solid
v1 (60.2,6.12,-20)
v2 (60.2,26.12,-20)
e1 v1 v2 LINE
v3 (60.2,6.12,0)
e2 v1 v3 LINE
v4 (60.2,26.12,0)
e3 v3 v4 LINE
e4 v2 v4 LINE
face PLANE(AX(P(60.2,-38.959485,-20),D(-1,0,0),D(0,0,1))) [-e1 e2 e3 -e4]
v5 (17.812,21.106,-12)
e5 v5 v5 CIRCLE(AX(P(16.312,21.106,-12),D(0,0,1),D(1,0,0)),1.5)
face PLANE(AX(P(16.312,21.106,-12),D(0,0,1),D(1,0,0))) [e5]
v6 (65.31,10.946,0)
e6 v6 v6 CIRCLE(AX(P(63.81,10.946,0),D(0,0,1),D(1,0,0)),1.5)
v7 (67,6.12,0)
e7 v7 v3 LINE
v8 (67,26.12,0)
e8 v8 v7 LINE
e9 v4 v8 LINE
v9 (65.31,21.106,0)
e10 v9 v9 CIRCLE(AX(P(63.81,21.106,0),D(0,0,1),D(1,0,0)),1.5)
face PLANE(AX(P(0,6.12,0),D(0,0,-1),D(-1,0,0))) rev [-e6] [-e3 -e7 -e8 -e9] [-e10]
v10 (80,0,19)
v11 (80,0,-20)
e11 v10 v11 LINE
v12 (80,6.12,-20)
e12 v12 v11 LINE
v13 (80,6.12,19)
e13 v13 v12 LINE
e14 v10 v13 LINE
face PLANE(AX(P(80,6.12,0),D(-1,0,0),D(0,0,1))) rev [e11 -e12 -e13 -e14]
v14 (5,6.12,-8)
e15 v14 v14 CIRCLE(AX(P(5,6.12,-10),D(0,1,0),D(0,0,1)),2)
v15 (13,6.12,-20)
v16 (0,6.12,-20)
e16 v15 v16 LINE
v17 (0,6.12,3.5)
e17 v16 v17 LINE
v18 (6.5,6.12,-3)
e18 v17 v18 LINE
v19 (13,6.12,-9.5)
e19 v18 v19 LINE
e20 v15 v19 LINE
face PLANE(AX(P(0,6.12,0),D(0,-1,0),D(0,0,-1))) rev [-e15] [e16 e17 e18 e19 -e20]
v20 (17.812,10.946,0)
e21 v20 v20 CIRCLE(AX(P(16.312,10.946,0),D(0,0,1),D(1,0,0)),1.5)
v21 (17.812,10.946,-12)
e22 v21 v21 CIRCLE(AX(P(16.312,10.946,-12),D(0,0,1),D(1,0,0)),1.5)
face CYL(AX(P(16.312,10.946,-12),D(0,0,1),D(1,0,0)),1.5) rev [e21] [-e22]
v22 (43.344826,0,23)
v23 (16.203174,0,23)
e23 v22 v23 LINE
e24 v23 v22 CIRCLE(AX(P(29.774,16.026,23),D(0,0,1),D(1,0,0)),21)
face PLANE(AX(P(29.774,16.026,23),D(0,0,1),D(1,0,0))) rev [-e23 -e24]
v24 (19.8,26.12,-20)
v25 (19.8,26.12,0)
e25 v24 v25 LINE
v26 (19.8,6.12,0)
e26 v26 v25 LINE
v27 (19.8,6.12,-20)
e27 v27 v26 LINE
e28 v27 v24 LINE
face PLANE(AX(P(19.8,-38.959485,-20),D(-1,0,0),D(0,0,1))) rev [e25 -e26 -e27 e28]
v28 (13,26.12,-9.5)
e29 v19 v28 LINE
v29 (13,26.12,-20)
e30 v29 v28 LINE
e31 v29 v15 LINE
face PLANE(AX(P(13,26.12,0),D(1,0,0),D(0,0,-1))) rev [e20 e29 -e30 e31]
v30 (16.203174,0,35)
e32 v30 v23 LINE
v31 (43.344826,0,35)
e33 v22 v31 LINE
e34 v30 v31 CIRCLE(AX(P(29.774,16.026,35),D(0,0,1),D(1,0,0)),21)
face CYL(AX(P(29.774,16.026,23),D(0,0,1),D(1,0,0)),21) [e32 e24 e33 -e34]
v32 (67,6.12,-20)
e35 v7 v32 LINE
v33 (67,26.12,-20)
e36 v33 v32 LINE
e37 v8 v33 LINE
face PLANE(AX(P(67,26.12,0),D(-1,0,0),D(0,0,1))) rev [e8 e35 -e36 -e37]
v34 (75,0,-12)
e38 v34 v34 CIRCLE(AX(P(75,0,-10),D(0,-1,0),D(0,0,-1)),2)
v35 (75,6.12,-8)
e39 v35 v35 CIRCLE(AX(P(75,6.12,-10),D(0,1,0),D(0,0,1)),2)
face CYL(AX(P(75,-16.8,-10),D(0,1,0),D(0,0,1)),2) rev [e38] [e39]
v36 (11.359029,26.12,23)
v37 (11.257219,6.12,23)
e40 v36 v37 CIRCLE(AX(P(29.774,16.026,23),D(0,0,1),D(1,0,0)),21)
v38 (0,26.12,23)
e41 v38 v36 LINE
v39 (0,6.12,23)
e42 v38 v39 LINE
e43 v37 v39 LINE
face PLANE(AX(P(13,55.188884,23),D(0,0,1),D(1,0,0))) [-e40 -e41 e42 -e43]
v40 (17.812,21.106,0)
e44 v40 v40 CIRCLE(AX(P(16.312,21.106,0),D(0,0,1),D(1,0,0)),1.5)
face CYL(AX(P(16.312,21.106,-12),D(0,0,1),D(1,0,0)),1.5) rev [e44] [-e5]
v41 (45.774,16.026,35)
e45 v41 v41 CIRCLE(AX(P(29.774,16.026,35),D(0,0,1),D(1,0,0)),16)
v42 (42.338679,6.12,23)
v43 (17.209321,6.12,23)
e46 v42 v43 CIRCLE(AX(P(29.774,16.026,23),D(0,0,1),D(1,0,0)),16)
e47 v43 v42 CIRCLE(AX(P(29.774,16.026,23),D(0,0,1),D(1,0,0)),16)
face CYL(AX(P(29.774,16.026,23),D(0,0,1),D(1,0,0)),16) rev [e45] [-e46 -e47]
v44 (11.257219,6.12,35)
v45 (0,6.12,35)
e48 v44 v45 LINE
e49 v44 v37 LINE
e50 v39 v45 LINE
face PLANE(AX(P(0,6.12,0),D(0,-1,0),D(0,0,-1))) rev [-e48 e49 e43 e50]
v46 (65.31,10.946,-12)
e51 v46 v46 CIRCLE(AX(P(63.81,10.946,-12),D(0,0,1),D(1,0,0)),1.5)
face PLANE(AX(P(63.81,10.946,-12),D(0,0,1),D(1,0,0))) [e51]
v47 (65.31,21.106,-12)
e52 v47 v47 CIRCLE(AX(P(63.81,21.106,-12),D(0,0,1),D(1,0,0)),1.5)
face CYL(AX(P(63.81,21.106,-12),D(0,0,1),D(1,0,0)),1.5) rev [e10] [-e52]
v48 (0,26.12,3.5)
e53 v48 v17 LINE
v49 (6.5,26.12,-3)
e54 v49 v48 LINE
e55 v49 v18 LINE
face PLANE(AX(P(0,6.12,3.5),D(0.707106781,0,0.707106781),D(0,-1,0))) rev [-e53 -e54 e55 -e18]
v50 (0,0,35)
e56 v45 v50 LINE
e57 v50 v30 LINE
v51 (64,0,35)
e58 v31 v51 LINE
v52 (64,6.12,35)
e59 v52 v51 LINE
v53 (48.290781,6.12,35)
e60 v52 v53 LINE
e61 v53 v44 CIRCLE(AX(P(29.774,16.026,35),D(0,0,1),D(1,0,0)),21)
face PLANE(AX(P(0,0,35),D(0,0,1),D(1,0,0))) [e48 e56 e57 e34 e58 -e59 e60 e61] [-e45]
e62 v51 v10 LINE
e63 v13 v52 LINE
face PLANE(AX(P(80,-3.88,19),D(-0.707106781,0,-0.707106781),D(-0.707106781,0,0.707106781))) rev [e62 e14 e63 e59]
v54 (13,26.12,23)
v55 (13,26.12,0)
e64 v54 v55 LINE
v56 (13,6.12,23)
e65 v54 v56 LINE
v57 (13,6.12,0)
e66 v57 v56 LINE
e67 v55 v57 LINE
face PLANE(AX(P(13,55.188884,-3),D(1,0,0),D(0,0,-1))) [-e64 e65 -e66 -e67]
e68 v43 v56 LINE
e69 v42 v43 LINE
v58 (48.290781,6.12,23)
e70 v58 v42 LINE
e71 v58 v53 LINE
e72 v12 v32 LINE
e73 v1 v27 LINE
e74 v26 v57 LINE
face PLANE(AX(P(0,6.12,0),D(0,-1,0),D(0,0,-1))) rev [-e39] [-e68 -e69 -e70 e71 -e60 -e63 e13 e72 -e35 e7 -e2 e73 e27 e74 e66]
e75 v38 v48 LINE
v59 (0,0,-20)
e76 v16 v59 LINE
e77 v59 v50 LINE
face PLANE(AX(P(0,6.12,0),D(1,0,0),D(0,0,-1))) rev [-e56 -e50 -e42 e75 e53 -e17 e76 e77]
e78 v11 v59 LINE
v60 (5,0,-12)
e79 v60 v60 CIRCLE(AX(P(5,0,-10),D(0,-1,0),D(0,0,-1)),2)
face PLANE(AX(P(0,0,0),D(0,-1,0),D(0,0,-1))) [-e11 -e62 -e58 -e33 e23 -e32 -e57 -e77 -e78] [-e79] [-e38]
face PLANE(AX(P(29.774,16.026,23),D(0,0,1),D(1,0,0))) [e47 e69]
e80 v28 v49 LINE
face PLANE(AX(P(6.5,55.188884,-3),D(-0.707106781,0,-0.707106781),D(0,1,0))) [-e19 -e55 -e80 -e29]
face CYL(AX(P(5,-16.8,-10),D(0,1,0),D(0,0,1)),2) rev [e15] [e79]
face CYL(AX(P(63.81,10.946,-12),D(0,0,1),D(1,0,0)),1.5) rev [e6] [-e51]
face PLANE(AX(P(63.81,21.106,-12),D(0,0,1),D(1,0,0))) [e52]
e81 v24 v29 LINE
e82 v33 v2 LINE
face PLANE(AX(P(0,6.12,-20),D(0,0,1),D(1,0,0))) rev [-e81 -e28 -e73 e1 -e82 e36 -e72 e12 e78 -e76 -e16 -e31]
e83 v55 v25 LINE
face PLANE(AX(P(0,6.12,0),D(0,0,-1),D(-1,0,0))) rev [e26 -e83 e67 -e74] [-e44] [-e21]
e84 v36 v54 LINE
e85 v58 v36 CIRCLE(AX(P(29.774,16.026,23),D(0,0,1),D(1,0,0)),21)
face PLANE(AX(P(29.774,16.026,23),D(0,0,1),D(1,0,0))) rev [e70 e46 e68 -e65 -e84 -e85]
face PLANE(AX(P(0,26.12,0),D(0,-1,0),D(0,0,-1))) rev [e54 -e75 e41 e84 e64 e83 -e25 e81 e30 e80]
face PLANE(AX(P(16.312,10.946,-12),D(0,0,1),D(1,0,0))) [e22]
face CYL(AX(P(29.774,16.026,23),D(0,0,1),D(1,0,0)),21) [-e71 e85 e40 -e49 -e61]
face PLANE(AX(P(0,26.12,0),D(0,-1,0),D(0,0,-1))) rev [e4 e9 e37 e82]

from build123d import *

# Parameters (mm, degrees)
SKETCH1_W           = 80
SKETCH1_H           = 20
BOSS_EXTRUDE1_DEPTH = 6.12
SKETCH14_R          = 2
CUT_EXTRUDE7_DEPTH  = 22.92
SKETCH2_W           = 7
SKETCH2_H           = 20
BOSS_EXTRUDE2_DEPTH = 20
SKETCH3_W           = 80
SKETCH3_H           = 6.12
BOSS_EXTRUDE3_DEPTH = 35
SKETCH5_R           = 21
BOSS_EXTRUDE4_DEPTH = 12
SKETCH4_R           = 16
CUT_EXTRUDE1_DEPTH  = 12
SKETCH7_R           = 1.5
CUT_EXTRUDE2_DEPTH  = 12
CUT_EXTRUDE4_DEPTH  = 10
SKETCH15_W          = 40.4
SKETCH15_H          = 20
CUT_EXTRUDE8_DEPTH  = 20
SKETCH16_W          = 13
SKETCH16_H          = 26
BOSS_EXTRUDE6_DEPTH = 20
CHAMFER1_SIZE       = 6.5


with BuildPart() as part:
    # Sketch1 → Boss-Extrude1 (new body)
    with BuildSketch(Plane(origin=(0, 0, 0), x_dir=(1, 0, 0), z_dir=(0, 1, 0))):
        with Locations((40, 10)):
            Rectangle(SKETCH1_W, SKETCH1_H)
    extrude(amount=BOSS_EXTRUDE1_DEPTH)

    # Sketch14 → Cut-Extrude7 (cut)
    with BuildSketch(Plane(origin=(0, 6.12, 0), x_dir=(1, 0, 0), z_dir=(0, 1, 0))):
        with Locations(Location((75, 10, 0), (0, 0, 270))):
            Circle(SKETCH14_R)
        with Locations(Location((5, 10, 0), (0, 0, 270))):
            Circle(SKETCH14_R)
    extrude(amount=-CUT_EXTRUDE7_DEPTH, mode=Mode.SUBTRACT)

    # Sketch2 → Boss-Extrude2 (add)
    with BuildSketch(Plane(origin=(0, 6.12, 0), x_dir=(1, 0, 0), z_dir=(0, 1, 0))):
        with Locations((16.5, 10)):
            Rectangle(SKETCH2_W, SKETCH2_H)
        with Locations((63.5, 10)):
            Rectangle(SKETCH2_W, SKETCH2_H)
    extrude(amount=BOSS_EXTRUDE2_DEPTH)

    # Sketch3 → Boss-Extrude3 (add)
    with BuildSketch(Plane.XY):
        with Locations((40, 3.06)):
            Rectangle(SKETCH3_W, SKETCH3_H)
    extrude(amount=BOSS_EXTRUDE3_DEPTH)

    # Sketch5 → Boss-Extrude4 (add)
    with BuildSketch(Plane.XY.offset(35)):
        with Locations((29.774, 16.026)):
            Circle(SKETCH5_R)
    extrude(amount=-BOSS_EXTRUDE4_DEPTH)

    # Sketch4 → Cut-Extrude1 (cut)
    with BuildSketch(Plane.XY.offset(35)):
        with Locations((29.774, 16.026)):
            Circle(SKETCH4_R)
    extrude(amount=-CUT_EXTRUDE1_DEPTH, mode=Mode.SUBTRACT)

    # Sketch7 → Cut-Extrude2 (cut)
    with BuildSketch(Plane.XY):
        with Locations((16.312, 21.106)):
            Circle(SKETCH7_R)
        with Locations((16.312, 10.946)):
            Circle(SKETCH7_R)
        with Locations((63.81, 10.946)):
            Circle(SKETCH7_R)
        with Locations((63.81, 21.106)):
            Circle(SKETCH7_R)
    extrude(amount=-CUT_EXTRUDE2_DEPTH, mode=Mode.SUBTRACT)

    # Sketch9 → Cut-Extrude4 (cut)
    with BuildSketch(Plane(origin=(0, 6.12, 0), x_dir=(1, 0, 0), z_dir=(0, 1, 0))):
        Polygon((80, -19), (64, -35), (80, -35), align=None)
    extrude(amount=-CUT_EXTRUDE4_DEPTH, mode=Mode.SUBTRACT)

    # Sketch15 → Cut-Extrude8 (cut)
    with BuildSketch(Plane(origin=(0, 26.12, 0), x_dir=(1, 0, 0), z_dir=(0, 1, 0))):
        with Locations((40, 10)):
            Rectangle(SKETCH15_W, SKETCH15_H)
    extrude(amount=-CUT_EXTRUDE8_DEPTH, mode=Mode.SUBTRACT)

    # Sketch16 → Boss-Extrude6 (add)
    with BuildSketch(Plane(origin=(0, 6.12, 0), x_dir=(1, 0, 0), z_dir=(0, 1, 0))):
        with Locations((6.5, -10)):
            Rectangle(SKETCH16_W, SKETCH16_H)
    extrude(amount=BOSS_EXTRUDE6_DEPTH)

    # Chamfer1
    chamfer1_edges = [part.edges().sort_by_distance(p)[0] for p in [
        (13, 16.12, -3),
    ]]
    chamfer(chamfer1_edges, length=CHAMFER1_SIZE)
    chamfer1_2_edges = [part.edges().sort_by_distance(p)[0] for p in [
        (0, 16.12, -3),
    ]]
    chamfer(chamfer1_2_edges, length=CHAMFER1_SIZE - 0.0001)  # a hair under: the kernel refuses the full size


solid = part.part
